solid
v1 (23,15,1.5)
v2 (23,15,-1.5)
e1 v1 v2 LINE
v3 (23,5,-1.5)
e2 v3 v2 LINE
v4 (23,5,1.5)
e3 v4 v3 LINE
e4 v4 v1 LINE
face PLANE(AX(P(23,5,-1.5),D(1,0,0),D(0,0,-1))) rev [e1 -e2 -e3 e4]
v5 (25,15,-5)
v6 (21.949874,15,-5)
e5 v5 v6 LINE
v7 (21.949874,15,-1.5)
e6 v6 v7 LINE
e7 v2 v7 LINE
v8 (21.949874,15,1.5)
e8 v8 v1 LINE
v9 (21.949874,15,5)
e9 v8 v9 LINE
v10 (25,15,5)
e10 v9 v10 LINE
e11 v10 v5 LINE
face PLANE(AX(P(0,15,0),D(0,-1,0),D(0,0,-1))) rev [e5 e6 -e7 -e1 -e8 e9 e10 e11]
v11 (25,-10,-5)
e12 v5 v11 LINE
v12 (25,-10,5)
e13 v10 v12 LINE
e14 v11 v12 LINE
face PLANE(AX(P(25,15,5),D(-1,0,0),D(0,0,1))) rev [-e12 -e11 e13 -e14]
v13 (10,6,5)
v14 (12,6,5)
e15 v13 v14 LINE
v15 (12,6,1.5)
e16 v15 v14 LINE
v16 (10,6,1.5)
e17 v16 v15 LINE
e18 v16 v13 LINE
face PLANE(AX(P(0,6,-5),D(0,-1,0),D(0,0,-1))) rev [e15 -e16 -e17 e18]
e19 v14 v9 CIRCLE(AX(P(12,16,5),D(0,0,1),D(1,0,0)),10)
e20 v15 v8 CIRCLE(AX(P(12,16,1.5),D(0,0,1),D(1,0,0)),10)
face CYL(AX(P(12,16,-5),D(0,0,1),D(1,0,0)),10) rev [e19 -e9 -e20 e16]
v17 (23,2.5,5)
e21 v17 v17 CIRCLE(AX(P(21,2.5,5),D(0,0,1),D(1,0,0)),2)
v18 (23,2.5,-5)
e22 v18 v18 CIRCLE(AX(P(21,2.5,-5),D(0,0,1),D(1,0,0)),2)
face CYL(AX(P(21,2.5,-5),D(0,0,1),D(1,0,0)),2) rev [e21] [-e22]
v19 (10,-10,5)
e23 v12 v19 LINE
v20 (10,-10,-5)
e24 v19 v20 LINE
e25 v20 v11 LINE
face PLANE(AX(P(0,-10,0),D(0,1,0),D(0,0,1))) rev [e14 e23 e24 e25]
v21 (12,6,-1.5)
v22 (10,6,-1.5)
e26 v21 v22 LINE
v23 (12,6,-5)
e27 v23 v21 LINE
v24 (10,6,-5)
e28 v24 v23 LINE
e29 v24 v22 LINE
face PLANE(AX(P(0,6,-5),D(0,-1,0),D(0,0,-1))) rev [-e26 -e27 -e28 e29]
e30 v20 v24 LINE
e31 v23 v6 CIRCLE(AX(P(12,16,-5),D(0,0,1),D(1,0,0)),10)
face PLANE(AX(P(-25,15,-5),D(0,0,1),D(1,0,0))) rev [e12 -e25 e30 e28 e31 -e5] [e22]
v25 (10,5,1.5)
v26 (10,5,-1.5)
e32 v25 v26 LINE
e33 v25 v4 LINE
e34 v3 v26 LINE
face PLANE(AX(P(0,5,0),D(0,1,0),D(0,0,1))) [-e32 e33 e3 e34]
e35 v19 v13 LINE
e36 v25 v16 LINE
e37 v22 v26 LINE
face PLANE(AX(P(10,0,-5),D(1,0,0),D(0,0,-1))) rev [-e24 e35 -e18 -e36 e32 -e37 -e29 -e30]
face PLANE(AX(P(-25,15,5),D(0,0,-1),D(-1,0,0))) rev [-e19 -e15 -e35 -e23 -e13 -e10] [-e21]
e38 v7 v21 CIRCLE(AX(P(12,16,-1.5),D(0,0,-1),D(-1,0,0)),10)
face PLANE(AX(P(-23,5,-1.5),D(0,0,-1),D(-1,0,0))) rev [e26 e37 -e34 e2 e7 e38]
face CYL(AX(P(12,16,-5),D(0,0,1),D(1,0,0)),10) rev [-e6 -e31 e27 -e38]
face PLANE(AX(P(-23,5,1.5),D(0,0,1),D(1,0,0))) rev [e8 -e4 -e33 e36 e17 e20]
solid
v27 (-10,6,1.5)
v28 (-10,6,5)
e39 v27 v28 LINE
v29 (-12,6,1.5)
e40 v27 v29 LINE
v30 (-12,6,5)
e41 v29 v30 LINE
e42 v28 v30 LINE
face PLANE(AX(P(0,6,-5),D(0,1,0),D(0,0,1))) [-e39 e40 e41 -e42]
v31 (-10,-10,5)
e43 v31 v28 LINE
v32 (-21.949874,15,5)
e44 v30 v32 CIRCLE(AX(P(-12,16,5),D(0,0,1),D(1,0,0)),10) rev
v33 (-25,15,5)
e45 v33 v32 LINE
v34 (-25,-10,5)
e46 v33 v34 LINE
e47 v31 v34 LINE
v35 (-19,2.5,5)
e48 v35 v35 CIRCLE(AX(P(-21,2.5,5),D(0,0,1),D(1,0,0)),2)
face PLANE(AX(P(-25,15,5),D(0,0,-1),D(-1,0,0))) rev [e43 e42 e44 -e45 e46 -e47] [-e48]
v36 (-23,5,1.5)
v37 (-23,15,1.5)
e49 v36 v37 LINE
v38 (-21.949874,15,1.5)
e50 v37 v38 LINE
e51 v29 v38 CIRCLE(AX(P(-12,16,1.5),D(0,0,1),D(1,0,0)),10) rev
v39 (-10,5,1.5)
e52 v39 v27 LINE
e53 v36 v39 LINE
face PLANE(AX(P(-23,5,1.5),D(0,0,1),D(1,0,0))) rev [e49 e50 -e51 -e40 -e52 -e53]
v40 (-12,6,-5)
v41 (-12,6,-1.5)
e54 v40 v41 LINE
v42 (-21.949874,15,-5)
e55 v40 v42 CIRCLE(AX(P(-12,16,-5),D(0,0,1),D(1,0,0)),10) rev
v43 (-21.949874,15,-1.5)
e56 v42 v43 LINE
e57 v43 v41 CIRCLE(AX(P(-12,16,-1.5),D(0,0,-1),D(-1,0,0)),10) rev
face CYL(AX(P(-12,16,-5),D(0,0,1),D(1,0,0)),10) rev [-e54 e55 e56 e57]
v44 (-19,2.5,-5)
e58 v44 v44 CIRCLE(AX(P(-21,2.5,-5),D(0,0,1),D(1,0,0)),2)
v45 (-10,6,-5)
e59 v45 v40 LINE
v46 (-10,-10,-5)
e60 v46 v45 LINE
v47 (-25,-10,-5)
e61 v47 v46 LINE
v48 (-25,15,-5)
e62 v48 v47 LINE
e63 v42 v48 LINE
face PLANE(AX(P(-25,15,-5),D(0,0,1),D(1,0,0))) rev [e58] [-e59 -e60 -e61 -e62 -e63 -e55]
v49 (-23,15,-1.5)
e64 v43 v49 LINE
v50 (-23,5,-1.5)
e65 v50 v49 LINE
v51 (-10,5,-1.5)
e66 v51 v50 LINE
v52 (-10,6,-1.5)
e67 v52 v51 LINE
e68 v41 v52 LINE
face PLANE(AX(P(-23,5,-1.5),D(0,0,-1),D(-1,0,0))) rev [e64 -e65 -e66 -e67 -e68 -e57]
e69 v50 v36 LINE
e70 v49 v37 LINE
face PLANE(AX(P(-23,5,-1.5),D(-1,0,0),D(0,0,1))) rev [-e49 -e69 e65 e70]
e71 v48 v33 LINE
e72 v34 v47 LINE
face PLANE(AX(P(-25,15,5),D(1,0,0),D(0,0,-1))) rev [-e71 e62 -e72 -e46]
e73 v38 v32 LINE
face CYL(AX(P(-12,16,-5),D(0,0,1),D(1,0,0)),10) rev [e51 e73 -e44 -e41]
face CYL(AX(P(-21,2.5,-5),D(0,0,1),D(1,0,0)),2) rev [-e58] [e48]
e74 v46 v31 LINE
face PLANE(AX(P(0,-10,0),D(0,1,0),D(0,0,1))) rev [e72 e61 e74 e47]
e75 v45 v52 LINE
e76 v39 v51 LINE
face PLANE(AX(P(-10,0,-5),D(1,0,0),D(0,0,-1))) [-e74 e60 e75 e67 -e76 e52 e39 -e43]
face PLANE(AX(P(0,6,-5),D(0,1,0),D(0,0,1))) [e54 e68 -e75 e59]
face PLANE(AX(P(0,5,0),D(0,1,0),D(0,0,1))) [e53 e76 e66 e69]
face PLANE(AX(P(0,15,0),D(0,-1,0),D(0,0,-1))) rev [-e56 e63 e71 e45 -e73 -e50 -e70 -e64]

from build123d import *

# Parameters (mm, degrees)
SKETCH1_W           = 50
SKETCH1_H           = 10
BOSS_EXTRUDE1_DEPTH = 15
SKETCH3_W           = 46
SKETCH3_H           = 3
CUT_EXTRUDE1_DEPTH  = 10
CUT_EXTRUDE2_DEPTH  = 10
SKETCH5_W           = 15
SKETCH5_H           = 10
BOSS_EXTRUDE2_DEPTH = 10
SKETCH6_R           = 2
CUT_EXTRUDE3_DEPTH  = 31.822070015


with BuildPart() as part:
    # Sketch1 → Boss-Extrude1 (new body)
    with BuildSketch(Plane(origin=(0, 0, 0), x_dir=(1, 0, 0), z_dir=(0, 1, 0))):
        Rectangle(SKETCH1_W, SKETCH1_H)
    extrude(amount=BOSS_EXTRUDE1_DEPTH)

    # Sketch3 → Cut-Extrude1 (cut)
    with BuildSketch(Plane(origin=(0, 15, 0), x_dir=(1, 0, 0), z_dir=(0, 1, 0))):
        Rectangle(SKETCH3_W, SKETCH3_H)
    extrude(amount=-CUT_EXTRUDE1_DEPTH, mode=Mode.SUBTRACT)

    # Sketch4 → Cut-Extrude2 (cut)
    with BuildSketch(Plane.XY.offset(5)):
        with BuildLine():
            Line((-10, 6), (-10, 0))
            Line((-10, 0), (10, 0))
            Line((10, 0), (10, 6))
            Line((10, 6), (12, 6))
            ThreePointArc((12, 6), (18.708203932, 8.583801513), (21.949874371, 15))
            Line((21.949874371, 15), (-21.949874371, 15))
            ThreePointArc((-21.949874371, 15), (-18.708203932, 8.583801513), (-12, 6))
            Line((-12, 6), (-10, 6))
        make_face()
    extrude(amount=-CUT_EXTRUDE2_DEPTH, mode=Mode.SUBTRACT)


with BuildPart() as cut_extrude2_piece_1:
    # of the separate pieces the step leaves, piece 1, a body of its own (cut_extrude2_pieces)
    add(part.part.solids().sort_by_distance((-25, 0, 5))[0])



with BuildPart() as cut_extrude2_piece_2:
    # of the separate pieces the step leaves, piece 2, a body of its own (cut_extrude2_pieces)
    add(part.part.solids().sort_by_distance((10, 0, 5))[0])


with BuildPart() as cut_extrude2_piece_1_1:
    add(cut_extrude2_piece_1.part)

    add(cut_extrude2_piece_2.part)  # Boss-Extrude2 merges Cut-Extrude2 piece 2
    # Sketch5 → Boss-Extrude2 (add)
    with BuildSketch(Plane.XZ):
        with Locations((-17.5, 0)):
            Rectangle(SKETCH5_W, SKETCH5_H)
        with Locations((17.5, 0)):
            Rectangle(SKETCH5_W, SKETCH5_H)
    extrude(amount=BOSS_EXTRUDE2_DEPTH)

    # Sketch6 → Cut-Extrude3 (cut, through all)
    with BuildSketch(Plane.XY.offset(5)):
        with Locations((-21, 2.5)):
            Circle(SKETCH6_R)
        with Locations((21, 2.5)):
            Circle(SKETCH6_R)
    extrude(amount=-CUT_EXTRUDE3_DEPTH, mode=Mode.SUBTRACT)


solid = cut_extrude2_piece_1_1.part
